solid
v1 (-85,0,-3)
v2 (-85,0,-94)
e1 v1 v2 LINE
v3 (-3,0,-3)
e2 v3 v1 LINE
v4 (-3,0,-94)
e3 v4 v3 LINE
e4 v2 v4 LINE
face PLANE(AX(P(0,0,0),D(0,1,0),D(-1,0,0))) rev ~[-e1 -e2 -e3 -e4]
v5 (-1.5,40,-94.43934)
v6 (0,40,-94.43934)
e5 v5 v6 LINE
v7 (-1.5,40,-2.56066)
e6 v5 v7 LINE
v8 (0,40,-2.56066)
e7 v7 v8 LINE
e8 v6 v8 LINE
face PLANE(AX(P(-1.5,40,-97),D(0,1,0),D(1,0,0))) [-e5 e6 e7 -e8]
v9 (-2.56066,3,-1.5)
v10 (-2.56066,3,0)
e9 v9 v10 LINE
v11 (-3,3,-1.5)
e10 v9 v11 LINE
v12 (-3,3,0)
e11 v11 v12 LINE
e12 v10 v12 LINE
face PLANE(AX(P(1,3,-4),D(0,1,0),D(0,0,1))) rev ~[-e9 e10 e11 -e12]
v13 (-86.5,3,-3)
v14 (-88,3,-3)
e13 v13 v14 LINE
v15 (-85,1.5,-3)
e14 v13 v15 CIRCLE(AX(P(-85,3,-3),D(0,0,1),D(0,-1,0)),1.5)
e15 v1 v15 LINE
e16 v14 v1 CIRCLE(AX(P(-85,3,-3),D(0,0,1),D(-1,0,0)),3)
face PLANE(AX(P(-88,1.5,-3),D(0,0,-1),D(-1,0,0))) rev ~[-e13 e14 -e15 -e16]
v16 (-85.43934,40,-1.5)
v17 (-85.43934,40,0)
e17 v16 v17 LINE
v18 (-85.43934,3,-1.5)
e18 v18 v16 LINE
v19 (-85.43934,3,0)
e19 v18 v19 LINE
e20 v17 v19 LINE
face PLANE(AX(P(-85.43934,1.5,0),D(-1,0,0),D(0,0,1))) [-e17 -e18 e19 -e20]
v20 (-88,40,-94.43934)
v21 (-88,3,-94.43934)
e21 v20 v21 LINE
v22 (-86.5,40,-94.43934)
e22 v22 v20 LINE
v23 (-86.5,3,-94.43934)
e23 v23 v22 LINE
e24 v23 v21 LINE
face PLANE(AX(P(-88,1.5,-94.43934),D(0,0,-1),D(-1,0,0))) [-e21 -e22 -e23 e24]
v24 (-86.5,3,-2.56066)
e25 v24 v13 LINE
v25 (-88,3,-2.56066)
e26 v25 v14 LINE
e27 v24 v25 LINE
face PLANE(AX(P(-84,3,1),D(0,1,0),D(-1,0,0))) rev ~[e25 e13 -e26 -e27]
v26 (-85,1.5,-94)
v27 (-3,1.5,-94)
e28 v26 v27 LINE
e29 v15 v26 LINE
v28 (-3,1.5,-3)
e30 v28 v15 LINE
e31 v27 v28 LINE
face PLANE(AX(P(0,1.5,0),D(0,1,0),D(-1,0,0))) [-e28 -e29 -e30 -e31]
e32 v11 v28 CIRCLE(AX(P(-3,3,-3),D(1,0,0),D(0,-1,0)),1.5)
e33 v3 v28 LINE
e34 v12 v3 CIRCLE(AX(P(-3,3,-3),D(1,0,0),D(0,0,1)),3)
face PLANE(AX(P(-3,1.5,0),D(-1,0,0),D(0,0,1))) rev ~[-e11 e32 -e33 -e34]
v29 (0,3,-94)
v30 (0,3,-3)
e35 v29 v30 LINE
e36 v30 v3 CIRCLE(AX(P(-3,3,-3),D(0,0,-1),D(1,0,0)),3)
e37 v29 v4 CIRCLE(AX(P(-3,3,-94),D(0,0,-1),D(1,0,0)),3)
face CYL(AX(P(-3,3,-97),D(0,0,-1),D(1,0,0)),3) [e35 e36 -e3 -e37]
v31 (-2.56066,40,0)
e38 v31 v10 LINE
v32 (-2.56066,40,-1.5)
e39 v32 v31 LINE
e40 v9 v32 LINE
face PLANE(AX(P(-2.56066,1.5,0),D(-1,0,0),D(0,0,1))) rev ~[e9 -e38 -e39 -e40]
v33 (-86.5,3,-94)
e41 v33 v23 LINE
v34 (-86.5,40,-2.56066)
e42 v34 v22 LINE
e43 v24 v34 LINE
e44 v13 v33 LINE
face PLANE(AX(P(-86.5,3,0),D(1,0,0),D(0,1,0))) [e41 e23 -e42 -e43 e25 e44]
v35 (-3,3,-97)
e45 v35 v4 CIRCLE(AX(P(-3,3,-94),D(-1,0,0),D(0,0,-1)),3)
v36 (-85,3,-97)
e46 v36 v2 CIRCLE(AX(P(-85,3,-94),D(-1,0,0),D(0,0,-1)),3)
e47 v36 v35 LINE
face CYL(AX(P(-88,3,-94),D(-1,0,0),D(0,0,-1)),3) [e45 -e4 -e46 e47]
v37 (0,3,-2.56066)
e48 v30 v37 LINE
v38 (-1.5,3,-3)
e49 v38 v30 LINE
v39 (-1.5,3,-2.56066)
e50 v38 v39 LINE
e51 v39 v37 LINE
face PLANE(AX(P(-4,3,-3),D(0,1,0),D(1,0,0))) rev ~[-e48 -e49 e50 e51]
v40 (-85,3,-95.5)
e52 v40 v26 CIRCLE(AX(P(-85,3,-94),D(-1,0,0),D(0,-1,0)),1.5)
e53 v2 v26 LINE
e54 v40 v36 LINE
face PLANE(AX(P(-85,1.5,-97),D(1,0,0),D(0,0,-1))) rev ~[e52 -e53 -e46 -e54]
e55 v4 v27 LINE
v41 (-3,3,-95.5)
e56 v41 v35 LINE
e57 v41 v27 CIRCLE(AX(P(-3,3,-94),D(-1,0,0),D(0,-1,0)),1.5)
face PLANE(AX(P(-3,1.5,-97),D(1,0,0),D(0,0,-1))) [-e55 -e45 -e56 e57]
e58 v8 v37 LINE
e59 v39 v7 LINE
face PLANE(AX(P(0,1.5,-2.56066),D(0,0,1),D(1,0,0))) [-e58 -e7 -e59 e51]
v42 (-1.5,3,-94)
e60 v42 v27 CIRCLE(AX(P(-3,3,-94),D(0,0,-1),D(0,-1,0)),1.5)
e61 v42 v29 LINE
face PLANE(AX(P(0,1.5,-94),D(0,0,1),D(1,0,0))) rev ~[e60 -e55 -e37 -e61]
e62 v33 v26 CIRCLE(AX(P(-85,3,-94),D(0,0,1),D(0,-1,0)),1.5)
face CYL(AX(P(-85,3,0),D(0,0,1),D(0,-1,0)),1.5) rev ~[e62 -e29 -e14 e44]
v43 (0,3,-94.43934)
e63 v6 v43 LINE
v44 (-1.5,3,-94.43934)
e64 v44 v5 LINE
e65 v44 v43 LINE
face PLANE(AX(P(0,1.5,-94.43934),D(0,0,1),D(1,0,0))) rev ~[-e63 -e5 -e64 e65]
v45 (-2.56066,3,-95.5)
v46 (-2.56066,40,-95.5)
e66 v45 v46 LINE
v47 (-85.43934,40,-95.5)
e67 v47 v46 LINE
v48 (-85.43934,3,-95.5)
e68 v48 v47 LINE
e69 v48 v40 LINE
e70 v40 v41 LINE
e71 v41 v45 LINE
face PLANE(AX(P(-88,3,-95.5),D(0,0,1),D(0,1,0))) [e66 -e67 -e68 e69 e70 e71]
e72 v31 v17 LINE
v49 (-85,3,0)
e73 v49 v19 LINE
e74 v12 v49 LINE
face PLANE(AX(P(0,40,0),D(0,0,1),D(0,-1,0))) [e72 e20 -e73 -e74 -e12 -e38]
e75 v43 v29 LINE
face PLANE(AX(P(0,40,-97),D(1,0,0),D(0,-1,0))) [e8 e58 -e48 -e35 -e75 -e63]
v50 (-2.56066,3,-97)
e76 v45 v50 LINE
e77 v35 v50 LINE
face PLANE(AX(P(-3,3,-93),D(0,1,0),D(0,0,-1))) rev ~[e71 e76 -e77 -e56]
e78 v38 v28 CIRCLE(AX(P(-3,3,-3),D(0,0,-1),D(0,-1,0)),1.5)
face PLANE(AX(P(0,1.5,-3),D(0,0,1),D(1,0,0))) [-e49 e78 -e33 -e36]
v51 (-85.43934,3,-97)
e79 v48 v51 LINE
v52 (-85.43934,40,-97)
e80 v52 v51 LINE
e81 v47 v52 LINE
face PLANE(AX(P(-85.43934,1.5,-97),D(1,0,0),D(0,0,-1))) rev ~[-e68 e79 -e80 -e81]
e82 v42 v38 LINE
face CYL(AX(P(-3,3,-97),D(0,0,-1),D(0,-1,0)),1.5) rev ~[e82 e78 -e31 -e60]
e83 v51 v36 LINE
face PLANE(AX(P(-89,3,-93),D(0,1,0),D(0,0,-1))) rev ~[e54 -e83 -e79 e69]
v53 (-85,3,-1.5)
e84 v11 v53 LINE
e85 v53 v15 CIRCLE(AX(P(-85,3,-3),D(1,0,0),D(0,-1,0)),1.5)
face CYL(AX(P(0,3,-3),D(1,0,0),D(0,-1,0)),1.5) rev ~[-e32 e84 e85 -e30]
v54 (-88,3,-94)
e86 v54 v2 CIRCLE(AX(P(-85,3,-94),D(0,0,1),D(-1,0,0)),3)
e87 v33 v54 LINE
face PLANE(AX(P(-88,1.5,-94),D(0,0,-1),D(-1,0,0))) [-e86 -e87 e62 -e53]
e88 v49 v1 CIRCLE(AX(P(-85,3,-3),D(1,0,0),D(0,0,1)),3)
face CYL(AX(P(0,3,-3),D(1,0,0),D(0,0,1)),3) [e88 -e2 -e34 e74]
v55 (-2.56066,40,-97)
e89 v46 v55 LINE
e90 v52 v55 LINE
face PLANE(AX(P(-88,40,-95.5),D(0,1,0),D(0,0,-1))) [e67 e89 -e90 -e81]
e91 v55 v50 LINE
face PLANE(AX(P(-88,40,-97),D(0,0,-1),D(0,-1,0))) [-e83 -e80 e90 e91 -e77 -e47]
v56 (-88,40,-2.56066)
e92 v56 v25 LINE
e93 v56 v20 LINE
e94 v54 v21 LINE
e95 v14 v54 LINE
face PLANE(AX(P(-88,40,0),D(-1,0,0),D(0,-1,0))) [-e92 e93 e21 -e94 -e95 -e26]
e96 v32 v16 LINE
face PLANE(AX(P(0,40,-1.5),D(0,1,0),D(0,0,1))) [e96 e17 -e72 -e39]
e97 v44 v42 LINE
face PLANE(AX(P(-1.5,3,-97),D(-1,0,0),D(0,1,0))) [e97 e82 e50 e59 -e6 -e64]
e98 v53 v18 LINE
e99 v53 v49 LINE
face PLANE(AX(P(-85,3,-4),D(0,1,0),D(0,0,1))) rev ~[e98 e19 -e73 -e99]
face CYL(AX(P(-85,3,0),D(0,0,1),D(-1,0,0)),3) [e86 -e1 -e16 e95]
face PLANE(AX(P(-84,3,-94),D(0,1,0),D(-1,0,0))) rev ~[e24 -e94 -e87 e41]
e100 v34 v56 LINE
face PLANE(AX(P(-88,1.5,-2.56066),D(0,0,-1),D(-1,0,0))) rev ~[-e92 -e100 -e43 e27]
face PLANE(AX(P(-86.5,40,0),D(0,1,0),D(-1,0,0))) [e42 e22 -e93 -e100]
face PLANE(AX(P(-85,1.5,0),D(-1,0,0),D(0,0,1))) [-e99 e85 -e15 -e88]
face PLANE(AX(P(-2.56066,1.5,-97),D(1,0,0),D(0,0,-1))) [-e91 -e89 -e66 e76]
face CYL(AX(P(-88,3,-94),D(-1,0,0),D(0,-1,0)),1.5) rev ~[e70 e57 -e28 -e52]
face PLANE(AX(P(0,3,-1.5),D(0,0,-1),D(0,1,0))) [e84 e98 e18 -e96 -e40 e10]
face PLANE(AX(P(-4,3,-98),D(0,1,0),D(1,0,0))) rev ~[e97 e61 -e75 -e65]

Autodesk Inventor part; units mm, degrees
ref_plane "YZ Plane" through (0, 0, 0) normal (1, 0, 0) x (0, 1, 0)
ref_plane "XZ Plane" through (0, 0, 0) normal (0, 1, 0) x (-1, 0, 0)
ref_plane "XY Plane" through (0, 0, 0) normal (0, 0, 1) x (1, 0, 0)
sketch "Sketch1" plane through (0, 0, 0) normal (0, 1, 0) x (-1, 0, 0)
  line L0 (0, 0) -> (88, 0)
  line L1 (88, 0) -> (88, -97)
  line L2 (88, -97) -> (0, -97)
  line L3 (0, -97) -> (0, 0)
  dimension "d0" = 97
  dimension "d1" = 88
extrude "Plate1" add sketch "Sketch1" along normal blind 1.5
sketch "Sketch2" plane through (-86.5, 0, 0) normal (-1, 0, 0) x (0, -1, 0)
  line L0 (0, -97) -> (0, 0)
  line L1 (0, 0) -> (-40, 0)
  line L2 (-40, 0) -> (-40, -97)
  line L3 (-40, -97) -> (0, -97)
edge flange "Flange1" height 40 angle 90 thickness 1.5 bend radius 1.5 thickness toward (-1, 0, 0) relief tear relief width 1.5 relief depth 0.75 corner gap 1.5 corner form 2 edges at (-88, 1.5, -48.5) (-44, 1.5, 0) (0, 1.5, -48.5) (-44, 1.5, -97) wall of the first edge with corners at (-86.5, 0, -97) (-86.5, 0, 0) (-86.5, 40, 0) (-86.5, 40, -97)
bend "Bend1"
corner "Corner1"
equation "\"d2\" = Thickness"
equation "\"d3\" = BendReliefWidth"
equation "\"d4\" = BendReliefDepth"
equation "\"d5\" = MinimumRemnant"
equation "\"d6\" = TransitionRadius"
equation "\"d9\" = BendRadius"
equation "\"d10\" = CornerReliefSize"
equation "\"d11\" = GapSize"
equation "\"d12\" = JacobiRadiusSize"
equation "\"BendRadius\" = Thickness"
equation "\"BendReliefWidth\" = Thickness"
equation "\"BendReliefDepth\" = 0.5 * Thickness"
equation "\"CornerReliefSize\" = 4 * Thickness"
equation "\"MinimumRemnant\" = 2 * Thickness"
equation "\"TransitionRadius\" = BendRadius"
equation "\"JacobiRadiusSize\" = BendRadius"
equation "\"GapSize\" = Thickness"
equation "\"Thickness\" = 1.5"
